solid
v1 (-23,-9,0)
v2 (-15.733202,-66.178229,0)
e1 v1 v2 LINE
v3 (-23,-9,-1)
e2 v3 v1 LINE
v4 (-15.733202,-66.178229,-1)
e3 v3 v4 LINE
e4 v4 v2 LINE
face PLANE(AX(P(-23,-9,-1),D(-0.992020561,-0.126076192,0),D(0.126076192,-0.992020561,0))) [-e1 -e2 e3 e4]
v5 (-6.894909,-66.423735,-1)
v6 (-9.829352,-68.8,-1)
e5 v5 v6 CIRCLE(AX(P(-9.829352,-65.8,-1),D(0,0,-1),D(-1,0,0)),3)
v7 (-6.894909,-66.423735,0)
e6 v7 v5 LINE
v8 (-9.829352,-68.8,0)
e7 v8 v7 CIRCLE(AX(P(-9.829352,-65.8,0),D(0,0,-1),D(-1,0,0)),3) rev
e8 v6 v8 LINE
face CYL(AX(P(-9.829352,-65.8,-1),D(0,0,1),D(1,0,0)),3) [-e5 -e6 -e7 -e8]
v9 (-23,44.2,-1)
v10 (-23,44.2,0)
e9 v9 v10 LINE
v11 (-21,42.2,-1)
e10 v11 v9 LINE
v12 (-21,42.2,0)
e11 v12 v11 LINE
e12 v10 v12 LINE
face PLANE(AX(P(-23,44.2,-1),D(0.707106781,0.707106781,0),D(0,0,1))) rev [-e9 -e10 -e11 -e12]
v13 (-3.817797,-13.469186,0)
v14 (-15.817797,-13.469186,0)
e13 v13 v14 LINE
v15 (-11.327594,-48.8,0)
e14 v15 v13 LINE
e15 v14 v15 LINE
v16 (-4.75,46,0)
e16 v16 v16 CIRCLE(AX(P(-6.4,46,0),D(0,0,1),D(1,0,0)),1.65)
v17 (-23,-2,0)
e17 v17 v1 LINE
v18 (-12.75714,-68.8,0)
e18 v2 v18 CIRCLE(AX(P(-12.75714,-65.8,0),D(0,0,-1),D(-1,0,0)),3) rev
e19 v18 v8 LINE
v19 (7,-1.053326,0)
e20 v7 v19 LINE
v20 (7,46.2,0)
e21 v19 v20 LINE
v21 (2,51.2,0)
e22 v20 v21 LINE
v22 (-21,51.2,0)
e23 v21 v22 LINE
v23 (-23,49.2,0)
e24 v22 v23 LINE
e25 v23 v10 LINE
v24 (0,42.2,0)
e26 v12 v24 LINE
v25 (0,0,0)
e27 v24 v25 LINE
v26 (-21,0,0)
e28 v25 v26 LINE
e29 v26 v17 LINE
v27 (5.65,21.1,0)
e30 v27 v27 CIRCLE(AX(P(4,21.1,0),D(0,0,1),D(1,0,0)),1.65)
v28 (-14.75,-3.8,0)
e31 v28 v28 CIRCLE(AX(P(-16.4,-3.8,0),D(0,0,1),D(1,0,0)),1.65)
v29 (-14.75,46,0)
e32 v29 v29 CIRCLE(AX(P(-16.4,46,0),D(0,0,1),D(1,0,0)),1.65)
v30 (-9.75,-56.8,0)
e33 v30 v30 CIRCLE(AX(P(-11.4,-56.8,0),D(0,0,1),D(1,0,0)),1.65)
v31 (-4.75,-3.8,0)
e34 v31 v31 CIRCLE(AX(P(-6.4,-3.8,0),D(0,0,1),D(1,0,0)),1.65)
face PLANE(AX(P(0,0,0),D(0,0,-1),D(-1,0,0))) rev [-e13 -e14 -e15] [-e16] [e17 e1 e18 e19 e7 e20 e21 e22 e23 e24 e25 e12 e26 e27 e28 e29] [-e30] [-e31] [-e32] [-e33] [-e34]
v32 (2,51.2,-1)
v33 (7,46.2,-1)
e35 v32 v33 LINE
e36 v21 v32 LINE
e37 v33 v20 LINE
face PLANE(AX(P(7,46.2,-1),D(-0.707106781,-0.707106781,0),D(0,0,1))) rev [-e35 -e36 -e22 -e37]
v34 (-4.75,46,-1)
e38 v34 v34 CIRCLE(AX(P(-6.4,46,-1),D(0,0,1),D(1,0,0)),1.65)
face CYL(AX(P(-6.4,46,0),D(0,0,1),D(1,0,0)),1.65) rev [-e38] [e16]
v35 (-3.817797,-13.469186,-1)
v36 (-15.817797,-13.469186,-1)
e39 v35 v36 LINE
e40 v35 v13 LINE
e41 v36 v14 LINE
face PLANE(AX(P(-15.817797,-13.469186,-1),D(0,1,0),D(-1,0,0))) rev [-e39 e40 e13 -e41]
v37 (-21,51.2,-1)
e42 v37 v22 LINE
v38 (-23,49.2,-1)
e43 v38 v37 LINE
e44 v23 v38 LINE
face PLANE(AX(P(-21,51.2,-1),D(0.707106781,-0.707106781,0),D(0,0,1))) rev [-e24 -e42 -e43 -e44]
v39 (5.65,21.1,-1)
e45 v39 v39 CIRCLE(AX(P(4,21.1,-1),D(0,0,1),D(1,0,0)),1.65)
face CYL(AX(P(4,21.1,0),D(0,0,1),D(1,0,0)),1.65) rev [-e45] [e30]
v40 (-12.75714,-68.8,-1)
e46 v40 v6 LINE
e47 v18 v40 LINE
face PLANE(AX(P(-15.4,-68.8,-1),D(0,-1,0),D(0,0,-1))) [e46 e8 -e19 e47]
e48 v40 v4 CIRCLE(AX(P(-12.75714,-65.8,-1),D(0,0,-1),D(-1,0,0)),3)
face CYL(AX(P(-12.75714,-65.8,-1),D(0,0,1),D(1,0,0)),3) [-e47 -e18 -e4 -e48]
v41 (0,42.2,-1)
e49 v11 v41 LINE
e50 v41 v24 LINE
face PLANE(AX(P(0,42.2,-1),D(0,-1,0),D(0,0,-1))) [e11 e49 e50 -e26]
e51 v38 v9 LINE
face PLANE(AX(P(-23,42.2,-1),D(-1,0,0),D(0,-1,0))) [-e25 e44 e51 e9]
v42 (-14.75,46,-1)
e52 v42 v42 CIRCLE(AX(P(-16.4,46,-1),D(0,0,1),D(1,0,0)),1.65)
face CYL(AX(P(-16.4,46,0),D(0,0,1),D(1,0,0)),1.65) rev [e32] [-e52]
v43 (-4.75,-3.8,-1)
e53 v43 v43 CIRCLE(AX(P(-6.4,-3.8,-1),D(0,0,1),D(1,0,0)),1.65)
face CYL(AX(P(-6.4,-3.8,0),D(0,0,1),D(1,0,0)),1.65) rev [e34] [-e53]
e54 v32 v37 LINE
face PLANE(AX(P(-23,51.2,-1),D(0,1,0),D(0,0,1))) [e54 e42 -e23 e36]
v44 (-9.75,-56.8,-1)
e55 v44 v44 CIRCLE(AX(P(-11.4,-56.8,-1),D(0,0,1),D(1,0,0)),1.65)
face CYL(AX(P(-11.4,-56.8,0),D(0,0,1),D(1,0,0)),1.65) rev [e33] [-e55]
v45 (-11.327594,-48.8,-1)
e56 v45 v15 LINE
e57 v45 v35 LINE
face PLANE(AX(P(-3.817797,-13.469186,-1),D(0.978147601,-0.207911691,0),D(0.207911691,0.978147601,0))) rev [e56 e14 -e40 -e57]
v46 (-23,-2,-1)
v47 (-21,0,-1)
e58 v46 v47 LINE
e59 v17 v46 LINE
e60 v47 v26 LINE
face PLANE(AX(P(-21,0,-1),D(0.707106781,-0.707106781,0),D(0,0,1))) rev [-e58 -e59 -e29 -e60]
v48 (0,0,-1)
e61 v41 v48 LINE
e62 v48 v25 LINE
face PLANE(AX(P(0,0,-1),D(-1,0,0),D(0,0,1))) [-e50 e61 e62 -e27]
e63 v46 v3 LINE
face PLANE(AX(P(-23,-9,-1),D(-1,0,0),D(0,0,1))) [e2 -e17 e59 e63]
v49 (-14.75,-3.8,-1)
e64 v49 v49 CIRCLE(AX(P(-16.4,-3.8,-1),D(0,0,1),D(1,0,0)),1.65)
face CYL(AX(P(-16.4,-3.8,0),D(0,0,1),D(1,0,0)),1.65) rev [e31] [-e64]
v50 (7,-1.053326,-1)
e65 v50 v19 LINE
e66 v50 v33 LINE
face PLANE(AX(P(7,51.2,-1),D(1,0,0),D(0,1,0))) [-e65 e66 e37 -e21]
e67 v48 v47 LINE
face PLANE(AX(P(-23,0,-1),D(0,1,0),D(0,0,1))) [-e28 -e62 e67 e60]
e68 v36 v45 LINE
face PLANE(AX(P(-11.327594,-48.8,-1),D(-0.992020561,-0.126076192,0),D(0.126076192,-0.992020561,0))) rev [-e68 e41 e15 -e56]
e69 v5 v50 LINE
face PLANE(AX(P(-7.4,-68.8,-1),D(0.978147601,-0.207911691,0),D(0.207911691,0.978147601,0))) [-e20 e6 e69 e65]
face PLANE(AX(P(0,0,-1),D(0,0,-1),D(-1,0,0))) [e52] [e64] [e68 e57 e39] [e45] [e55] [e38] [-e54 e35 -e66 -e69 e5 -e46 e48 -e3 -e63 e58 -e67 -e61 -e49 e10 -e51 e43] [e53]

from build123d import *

# Parameters (mm, degrees)
SM_BASE_FLANGE_1_DEPTH  = 1
HOLE_WIZARD_3_3_3_3_1_D = 3.3
CHAMFER_2_SIZE          = 5
FILLET_1_R              = 3
CHAMFER_3_SIZE          = 2


# Sheet-metal steps are written as plain solids
with BuildPart() as part:
    # Sketch 1 → 基体-法兰1 (new body)
    with BuildSketch(Plane.XY):
        Polygon((-23, 0), (0, 0), (0, 42.2), (-23, 42.2), (-23, 51.2), (7, 51.2), (7, -1.053326424), (-7.4, -68.8), (-15.4, -68.8), (-23, -9), align=None)
        Polygon((-15.817797263, -13.469186385), (-3.817797263, -13.469186385), (-11.327593526, -48.8), align=None, mode=Mode.SUBTRACT)
    extrude(amount=-SM_BASE_FLANGE_1_DEPTH)

    # Ø3.3 (3.3) 直径孔1 (through all)
    with Locations(Plane.XY):
        with Locations((-6.4, 46), (-16.4, 46), (-16.4, -3.8), (-6.4, -3.8), (4, 21.1), (-11.4, -56.8)):
            Hole(HOLE_WIZARD_3_3_3_3_1_D / 2)

    # 倒角2
    chamfer_2_edges = [part.edges().sort_by_distance(p)[0] for p in [
        (7, 51.2, -0.5),
    ]]
    chamfer(chamfer_2_edges, length=CHAMFER_2_SIZE)

    # 圆角1
    fillet_1_edges = [part.edges().sort_by_distance(p)[0] for p in [
        (-7.4, -68.8, -0.5),
        (-15.4, -68.8, -0.5),
    ]]
    fillet(fillet_1_edges, radius=FILLET_1_R)

    # 倒角3
    chamfer_3_edges = [part.edges().sort_by_distance(p)[0] for p in [
        (-23, 0, -0.5),
        (-23, 42.2, -0.5),
        (-23, 51.2, -0.5),
    ]]
    chamfer(chamfer_3_edges, length=CHAMFER_3_SIZE)


solid = part.part
